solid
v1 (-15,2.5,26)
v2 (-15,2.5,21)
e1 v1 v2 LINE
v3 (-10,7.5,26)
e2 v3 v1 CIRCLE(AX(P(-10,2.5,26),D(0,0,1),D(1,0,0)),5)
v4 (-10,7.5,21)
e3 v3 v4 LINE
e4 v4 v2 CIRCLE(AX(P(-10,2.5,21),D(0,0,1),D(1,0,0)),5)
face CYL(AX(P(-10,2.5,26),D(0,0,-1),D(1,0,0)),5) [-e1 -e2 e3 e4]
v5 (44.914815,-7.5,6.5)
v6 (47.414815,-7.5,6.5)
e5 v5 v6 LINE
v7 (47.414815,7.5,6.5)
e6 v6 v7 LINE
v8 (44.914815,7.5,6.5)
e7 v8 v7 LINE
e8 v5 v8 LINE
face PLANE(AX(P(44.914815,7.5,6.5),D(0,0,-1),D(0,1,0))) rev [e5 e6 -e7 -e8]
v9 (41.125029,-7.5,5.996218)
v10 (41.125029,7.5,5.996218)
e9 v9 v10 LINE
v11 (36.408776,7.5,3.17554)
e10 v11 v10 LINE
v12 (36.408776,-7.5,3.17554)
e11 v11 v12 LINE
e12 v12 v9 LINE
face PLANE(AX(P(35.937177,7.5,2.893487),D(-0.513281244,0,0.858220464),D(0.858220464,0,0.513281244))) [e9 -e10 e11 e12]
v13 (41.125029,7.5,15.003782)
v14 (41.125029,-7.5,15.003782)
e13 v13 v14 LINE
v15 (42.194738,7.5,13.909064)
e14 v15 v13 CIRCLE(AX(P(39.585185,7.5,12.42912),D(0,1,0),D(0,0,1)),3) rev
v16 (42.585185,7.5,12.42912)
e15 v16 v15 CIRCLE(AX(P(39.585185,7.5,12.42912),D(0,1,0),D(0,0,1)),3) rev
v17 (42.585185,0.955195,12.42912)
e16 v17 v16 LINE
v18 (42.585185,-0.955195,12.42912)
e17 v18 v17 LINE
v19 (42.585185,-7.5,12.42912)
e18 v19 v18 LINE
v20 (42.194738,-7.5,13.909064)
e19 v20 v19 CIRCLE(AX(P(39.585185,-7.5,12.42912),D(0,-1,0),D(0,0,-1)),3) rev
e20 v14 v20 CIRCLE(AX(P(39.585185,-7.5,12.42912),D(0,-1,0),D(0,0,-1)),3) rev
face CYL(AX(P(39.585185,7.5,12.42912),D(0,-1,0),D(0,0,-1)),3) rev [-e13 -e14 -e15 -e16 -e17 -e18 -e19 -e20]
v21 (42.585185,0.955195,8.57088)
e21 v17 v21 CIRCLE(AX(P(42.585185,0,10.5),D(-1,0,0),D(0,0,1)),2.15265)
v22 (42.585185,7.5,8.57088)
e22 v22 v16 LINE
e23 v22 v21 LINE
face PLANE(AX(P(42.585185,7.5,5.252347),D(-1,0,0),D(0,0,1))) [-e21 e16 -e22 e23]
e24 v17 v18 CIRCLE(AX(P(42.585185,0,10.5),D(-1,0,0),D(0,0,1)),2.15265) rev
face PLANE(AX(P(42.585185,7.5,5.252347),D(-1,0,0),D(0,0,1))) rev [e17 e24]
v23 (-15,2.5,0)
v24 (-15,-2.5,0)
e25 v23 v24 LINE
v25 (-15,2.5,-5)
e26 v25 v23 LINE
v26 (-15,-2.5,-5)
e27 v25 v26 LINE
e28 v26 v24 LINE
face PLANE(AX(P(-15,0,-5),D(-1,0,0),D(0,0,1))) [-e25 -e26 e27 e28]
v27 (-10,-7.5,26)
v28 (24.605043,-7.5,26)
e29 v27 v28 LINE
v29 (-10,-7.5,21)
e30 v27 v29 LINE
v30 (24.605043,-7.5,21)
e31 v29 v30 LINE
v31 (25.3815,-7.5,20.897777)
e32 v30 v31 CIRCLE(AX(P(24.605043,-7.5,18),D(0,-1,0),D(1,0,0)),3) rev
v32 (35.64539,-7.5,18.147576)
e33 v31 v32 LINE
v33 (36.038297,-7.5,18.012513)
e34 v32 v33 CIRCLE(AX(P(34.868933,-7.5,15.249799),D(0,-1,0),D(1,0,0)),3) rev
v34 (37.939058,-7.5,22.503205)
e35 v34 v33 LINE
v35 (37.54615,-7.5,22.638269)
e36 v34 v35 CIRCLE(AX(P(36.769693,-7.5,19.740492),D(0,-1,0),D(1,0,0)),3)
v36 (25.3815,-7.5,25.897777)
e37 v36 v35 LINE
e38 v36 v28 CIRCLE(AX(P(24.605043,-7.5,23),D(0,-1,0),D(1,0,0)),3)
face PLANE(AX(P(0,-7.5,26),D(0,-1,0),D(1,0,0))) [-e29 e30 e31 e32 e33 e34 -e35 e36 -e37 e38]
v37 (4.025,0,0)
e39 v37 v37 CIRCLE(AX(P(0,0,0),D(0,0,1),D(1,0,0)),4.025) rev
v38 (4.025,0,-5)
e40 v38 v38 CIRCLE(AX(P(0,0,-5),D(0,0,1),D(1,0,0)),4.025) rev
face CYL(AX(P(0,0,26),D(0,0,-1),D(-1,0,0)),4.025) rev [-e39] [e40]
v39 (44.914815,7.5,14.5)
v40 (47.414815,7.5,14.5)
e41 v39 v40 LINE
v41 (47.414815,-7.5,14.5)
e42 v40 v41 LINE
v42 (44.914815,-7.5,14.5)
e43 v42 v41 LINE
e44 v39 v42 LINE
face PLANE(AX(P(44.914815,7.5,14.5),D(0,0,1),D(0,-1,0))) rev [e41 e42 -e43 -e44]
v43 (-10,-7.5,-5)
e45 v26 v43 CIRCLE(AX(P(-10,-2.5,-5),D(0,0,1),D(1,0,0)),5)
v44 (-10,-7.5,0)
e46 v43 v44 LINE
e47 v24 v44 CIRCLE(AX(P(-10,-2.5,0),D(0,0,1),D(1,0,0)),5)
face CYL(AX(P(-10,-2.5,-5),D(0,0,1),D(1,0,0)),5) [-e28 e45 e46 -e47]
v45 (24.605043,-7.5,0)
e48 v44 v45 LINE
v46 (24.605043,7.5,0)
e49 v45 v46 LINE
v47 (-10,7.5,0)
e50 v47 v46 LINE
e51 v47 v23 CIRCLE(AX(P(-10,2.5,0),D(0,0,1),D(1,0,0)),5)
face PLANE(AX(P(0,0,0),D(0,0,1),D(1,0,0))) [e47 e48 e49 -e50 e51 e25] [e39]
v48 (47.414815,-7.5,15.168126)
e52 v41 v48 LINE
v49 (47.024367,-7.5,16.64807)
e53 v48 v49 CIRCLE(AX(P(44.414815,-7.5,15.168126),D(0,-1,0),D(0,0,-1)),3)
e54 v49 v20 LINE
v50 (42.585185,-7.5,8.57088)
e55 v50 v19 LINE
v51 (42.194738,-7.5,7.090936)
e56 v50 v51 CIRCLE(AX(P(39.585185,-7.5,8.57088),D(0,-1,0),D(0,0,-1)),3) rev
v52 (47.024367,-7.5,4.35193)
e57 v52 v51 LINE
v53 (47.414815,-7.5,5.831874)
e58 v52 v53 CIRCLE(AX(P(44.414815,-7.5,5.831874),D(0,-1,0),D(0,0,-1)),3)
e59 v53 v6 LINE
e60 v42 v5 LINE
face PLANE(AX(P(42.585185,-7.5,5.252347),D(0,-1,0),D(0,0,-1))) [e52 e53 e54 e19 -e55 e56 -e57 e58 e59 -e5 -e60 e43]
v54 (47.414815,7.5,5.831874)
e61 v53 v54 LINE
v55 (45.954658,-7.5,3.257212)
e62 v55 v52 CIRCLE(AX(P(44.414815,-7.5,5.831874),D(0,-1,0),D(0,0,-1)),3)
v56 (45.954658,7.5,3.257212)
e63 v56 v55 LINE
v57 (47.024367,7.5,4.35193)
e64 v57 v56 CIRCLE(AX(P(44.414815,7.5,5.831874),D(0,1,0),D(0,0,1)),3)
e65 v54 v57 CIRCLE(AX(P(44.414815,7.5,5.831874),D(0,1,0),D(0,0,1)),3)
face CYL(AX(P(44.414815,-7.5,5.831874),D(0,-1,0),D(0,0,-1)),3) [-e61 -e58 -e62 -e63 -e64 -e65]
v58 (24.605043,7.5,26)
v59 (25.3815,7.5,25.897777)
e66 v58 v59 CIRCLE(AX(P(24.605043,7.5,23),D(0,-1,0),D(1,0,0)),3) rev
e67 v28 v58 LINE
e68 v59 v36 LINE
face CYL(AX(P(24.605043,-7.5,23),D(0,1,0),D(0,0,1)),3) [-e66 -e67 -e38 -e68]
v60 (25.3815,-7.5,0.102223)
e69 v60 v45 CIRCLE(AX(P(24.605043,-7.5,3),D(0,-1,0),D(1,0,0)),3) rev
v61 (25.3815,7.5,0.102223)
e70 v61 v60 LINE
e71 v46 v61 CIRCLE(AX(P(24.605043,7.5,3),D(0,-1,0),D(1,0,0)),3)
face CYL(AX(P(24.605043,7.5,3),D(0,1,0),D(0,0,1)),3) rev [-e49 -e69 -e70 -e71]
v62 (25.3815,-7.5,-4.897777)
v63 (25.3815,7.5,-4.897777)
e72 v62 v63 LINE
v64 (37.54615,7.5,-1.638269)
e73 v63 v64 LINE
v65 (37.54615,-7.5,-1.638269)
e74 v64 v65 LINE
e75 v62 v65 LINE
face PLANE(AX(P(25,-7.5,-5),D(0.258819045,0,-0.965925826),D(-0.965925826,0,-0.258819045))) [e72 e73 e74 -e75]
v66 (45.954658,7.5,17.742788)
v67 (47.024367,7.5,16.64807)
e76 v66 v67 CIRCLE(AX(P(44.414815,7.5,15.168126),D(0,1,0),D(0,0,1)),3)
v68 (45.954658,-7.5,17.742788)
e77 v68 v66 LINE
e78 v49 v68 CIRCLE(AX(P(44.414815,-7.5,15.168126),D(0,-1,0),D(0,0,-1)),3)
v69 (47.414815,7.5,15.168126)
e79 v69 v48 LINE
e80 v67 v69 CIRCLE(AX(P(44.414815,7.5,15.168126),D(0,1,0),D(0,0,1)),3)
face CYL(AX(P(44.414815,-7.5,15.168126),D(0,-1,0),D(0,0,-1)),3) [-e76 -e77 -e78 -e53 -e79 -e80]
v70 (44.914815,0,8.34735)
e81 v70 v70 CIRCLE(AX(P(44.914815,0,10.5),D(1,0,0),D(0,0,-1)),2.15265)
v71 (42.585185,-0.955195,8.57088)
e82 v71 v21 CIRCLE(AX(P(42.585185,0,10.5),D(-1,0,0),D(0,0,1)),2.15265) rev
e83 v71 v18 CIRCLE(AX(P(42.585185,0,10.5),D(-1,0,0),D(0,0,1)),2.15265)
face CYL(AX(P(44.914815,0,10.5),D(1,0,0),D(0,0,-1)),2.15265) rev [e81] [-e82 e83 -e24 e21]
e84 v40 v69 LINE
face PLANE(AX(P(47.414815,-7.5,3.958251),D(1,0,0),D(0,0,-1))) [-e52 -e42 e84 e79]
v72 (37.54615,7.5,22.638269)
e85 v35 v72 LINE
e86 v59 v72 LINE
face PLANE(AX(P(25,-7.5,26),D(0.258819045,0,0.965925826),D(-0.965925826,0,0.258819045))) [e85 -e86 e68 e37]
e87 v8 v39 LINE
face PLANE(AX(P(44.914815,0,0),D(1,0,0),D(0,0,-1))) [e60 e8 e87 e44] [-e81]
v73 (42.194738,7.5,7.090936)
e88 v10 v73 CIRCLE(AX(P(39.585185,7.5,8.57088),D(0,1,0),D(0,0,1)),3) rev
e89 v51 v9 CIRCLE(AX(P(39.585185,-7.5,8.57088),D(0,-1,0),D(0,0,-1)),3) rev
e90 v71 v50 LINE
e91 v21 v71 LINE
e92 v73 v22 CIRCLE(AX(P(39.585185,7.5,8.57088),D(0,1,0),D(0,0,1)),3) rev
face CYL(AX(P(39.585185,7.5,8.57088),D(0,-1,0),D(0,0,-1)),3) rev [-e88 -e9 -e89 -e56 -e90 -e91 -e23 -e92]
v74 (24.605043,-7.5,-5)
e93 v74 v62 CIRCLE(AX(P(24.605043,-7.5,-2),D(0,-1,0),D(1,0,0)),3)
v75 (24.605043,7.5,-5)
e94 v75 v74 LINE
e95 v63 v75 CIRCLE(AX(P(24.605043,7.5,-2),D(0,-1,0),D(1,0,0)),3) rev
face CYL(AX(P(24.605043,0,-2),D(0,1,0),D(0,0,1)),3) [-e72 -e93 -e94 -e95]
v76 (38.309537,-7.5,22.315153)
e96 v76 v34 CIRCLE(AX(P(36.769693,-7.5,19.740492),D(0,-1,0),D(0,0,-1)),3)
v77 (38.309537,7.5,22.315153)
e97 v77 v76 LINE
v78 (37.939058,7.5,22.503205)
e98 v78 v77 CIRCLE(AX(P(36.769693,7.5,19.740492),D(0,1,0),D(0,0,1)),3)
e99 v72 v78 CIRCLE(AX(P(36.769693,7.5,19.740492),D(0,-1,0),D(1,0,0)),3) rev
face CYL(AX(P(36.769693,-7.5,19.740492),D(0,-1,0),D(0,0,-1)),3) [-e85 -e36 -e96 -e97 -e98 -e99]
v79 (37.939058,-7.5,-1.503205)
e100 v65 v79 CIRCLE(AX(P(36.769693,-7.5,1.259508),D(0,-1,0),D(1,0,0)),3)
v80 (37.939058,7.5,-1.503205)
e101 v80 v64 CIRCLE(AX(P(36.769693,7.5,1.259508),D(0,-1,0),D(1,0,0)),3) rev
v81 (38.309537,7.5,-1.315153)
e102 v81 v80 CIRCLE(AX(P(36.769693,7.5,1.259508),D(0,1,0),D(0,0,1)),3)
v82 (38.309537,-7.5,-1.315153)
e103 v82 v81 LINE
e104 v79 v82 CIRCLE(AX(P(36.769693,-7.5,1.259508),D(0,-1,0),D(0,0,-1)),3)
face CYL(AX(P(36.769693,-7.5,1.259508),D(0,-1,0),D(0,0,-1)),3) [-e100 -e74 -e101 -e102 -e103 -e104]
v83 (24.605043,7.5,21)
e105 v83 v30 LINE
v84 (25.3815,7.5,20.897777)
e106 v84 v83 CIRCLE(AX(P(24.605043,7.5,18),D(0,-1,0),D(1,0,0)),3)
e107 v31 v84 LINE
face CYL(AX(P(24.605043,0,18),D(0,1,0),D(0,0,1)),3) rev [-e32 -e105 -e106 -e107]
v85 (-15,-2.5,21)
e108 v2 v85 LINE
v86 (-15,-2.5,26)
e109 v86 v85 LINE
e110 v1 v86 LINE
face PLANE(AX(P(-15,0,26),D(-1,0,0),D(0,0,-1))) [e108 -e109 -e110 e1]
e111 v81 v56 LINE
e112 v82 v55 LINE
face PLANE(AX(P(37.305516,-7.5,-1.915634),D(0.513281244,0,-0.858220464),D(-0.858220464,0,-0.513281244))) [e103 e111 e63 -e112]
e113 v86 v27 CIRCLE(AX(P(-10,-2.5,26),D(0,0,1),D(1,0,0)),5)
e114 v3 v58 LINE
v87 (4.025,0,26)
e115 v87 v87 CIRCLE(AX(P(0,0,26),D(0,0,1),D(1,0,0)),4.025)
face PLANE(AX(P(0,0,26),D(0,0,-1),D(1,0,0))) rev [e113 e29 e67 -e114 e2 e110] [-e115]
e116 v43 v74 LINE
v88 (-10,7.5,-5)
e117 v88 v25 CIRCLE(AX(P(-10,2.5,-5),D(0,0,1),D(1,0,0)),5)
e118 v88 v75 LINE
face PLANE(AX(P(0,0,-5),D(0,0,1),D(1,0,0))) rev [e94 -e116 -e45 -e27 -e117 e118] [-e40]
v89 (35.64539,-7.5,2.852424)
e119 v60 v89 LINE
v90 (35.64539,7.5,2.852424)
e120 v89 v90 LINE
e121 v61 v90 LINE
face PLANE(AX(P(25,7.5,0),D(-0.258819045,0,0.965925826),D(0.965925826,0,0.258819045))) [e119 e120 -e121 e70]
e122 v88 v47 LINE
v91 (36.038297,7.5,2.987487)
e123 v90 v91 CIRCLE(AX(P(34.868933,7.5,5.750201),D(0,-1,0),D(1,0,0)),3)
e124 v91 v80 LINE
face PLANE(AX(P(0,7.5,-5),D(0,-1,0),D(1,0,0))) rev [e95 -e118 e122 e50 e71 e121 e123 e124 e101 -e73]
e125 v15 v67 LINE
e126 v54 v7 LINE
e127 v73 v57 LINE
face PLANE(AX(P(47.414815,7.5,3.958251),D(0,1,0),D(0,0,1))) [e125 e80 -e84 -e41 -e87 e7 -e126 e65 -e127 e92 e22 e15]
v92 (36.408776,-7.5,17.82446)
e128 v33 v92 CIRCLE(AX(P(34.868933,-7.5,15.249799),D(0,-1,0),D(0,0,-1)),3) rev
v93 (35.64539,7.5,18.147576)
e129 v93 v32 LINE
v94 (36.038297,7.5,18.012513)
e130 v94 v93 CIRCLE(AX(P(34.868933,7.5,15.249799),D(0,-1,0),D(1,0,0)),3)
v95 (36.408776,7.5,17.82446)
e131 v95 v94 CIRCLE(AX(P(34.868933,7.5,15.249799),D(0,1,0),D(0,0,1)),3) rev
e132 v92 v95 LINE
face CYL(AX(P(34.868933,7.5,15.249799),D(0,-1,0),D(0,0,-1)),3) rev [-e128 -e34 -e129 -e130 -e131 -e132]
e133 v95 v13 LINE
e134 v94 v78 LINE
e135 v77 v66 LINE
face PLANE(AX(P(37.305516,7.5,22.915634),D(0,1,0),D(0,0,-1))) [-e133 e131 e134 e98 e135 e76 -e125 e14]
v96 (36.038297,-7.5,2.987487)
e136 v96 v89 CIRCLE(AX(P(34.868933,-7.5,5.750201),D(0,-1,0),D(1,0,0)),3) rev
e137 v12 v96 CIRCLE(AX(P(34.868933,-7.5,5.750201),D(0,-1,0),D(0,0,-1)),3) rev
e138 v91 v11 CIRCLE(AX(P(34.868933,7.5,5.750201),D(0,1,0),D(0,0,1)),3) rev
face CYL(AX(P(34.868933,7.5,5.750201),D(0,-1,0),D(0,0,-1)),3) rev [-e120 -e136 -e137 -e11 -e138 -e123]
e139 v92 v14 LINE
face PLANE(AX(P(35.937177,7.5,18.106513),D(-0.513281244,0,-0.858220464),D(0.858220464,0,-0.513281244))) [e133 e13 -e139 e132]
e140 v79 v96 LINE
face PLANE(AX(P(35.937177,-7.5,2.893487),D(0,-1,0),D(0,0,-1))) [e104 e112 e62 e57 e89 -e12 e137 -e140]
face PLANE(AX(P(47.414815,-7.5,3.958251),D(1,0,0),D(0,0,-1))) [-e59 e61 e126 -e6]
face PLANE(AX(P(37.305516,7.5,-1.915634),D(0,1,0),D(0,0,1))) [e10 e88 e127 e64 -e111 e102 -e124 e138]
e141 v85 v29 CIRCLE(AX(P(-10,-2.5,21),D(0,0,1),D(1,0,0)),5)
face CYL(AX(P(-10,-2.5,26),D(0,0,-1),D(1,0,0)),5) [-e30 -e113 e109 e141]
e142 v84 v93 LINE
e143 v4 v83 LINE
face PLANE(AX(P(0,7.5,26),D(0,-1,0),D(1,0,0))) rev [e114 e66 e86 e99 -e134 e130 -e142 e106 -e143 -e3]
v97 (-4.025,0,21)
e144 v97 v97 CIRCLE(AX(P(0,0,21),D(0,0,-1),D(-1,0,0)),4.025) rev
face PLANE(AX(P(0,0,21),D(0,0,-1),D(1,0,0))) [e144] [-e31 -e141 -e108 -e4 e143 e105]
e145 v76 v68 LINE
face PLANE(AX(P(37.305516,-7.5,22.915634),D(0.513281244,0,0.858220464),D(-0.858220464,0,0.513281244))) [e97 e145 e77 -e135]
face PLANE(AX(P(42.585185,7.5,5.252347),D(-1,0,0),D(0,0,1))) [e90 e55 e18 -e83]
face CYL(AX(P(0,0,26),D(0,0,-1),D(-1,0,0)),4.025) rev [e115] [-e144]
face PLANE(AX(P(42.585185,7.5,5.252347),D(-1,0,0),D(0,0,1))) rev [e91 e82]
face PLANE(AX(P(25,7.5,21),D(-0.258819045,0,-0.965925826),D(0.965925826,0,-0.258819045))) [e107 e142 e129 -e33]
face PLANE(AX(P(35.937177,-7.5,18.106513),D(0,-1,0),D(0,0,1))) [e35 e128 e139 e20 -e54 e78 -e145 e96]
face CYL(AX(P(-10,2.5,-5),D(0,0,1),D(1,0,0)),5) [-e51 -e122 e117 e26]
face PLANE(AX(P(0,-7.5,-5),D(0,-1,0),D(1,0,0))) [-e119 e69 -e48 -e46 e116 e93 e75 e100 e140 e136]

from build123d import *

# Parameters (mm, degrees)
SHAPE_BASE_R                   = 4.025
BOSS_EXTRUDE1_DEPTH            = 5
SWEEP2_START                   = -7.5
SWEEP2_DEPTH                   = 15
CUT_EXTRUDE2_REACH             = 52.965
BOSS_EXTRUDE2_DEPTH            = 15
CUT_EXTRUDE3_REACH             = 56.593
SKETCH4_10_R                   = 4.025
CUT_EXTRUDE3_DIRECTION_2_DEPTH = 55.593173935
FILLET1_R                      = 3
SKETCH21_W                     = 8
SKETCH21_H                     = 15
CUT_EXTRUDE4_DEPTH             = 2.5
F_6_CLEARANCE_HOLE1_D          = 4.3053
F_6_CLEARANCE_HOLE1_DEPTH      = 2.329629131


# Read off the part's stored shape, not the designer's step: Sweep2
with BuildPart() as part:
    # Shape - base → Boss-Extrude1 (new body)
    # profile 1 of 2: a face of its own
    with BuildSketch(Plane.XY):
        with BuildLine():
            Line((-10, 7.5), (25, 7.5))
            Line((25, 7.5), (25, -7.5))
            Line((25, -7.5), (-10, -7.5))
            ThreePointArc((-10, -7.5), (-13.535533906, -6.035533906), (-15, -2.5))
            Line((-15, -2.5), (-15, 2.5))
            ThreePointArc((-15, 2.5), (-13.535533906, 6.035533906), (-10, 7.5))
        make_face()
        Circle(SHAPE_BASE_R, mode=Mode.SUBTRACT)
    # profile 2 of 2: a face of its own
    with BuildSketch(Plane.XY):
        Circle(SHAPE_BASE_R)
    extrude(amount=-BOSS_EXTRUDE1_DEPTH)

    # Sweep2 outline → Sweep2 (add)
    with BuildSketch(Plane(origin=(0, 0, 0), x_dir=(1, 0, 0), z_dir=(0, 1, 0)).offset(SWEEP2_START)):
        Polygon((42.585185434, -6.869503049), (42.585185434, -11.147047613), (47.414814566, -9.852952387), (47.414814566, -4.130496951), (37.95038024, 1.529956073), (25, 5), (25, 0), (36.04961976, -2.960736691), align=None)
    extrude(amount=SWEEP2_DEPTH)

    # Sketch18 → Cut-Extrude2 (cut, up to next)
    with BuildSketch(Plane(origin=(0, 7.5, 0), x_dir=(1, 0, 0), z_dir=(0, 1, 0)), mode=Mode.PRIVATE) as cut_extrude2_sk1:
        Polygon((42.585185434, -11.147047613), (45, -10.5), (42.585185434, -10.5), align=None)
    cut_extrude2_tool1 = extrude(cut_extrude2_sk1.sketch, amount=-CUT_EXTRUDE2_REACH, mode=Mode.PRIVATE) & part.part
    add(cut_extrude2_tool1.solids().sort_by_distance((43.390124, 7.5, 10.715683))[0], mode=Mode.SUBTRACT)

    # Sketch18<3> → Boss-Extrude2 (add, through all)
    with BuildSketch(Plane(origin=(0, 7.5, 0), x_dir=(1, 0, 0), z_dir=(0, 1, 0))):
        Polygon((47.414814566, -10.5), (47.414814566, -9.852952387), (45, -10.5), align=None)
    extrude(amount=-BOSS_EXTRUDE2_DEPTH)

    # Mirror1: part across face


with BuildPart() as part_1:
    add(part.part)
    add(part.part.mirror(Plane(origin=(45, 0, 10.5), x_dir=(1, 0, 0), z_dir=(0, 0, 1))))

    # Sketch4<10> → Cut-Extrude3 (cut, up to next)
    with BuildSketch(Plane.XY, mode=Mode.PRIVATE) as cut_extrude3_sk1:
        with Locations(Location((0, 0, 0), (0, 0, 180))):
            Circle(SKETCH4_10_R)
    cut_extrude3_tool1 = extrude(cut_extrude3_sk1.sketch, amount=-CUT_EXTRUDE3_REACH, mode=Mode.PRIVATE) & part_1.part
    add(cut_extrude3_tool1.solids().sort_by_distance((0, 0, 0))[0], mode=Mode.SUBTRACT)

    # Sketch4<10> → Cut-Extrude3 direction 2 (cut)
    with BuildSketch(Plane.XY):
        with Locations(Location((0, 0, 0), (0, 0, 180))):
            Circle(SKETCH4_10_R)
    extrude(amount=CUT_EXTRUDE3_DIRECTION_2_DEPTH, mode=Mode.SUBTRACT)

    # Fillet1
    fillet1_edges = [part_1.edges().sort_by_distance(p)[0] for p in [
        (47.414814566, 0, 4.130496951),
        (42.585185434, 0, 6.869503049),
        (37.95038024, 0, -1.529956073),
        (36.04961976, 0, 2.960736691),
        (25, 0, -5),
        (25, 0, 0),
        (25, 0, 21),
        (42.585185434, 0, 14.130496951),
        (47.414814566, 0, 16.869503049),
        (37.95038024, 0, 22.529956073),
        (36.04961976, 0, 18.039263309),
        (25, 0, 26),
    ]]
    fillet(fillet1_edges, radius=FILLET1_R)

    # Sketch21 → Cut-Extrude4 (cut)
    with BuildSketch(Plane(origin=(47.414814566, 0, 0), x_dir=(0, 0, -1), z_dir=(1, 0, 0))):
        with Locations((-10.5, 0)):
            Rectangle(SKETCH21_W, SKETCH21_H)
    extrude(amount=-CUT_EXTRUDE4_DEPTH, mode=Mode.SUBTRACT)

    # #6 Clearance Hole1
    with Locations(Plane(origin=(44.914814566, 0, 0), x_dir=(0, 0, -1), z_dir=(1, 0, 0))):
        with Locations((-10.5, 0)):
            Hole(F_6_CLEARANCE_HOLE1_D / 2, depth=F_6_CLEARANCE_HOLE1_DEPTH)


solid = part_1.part
